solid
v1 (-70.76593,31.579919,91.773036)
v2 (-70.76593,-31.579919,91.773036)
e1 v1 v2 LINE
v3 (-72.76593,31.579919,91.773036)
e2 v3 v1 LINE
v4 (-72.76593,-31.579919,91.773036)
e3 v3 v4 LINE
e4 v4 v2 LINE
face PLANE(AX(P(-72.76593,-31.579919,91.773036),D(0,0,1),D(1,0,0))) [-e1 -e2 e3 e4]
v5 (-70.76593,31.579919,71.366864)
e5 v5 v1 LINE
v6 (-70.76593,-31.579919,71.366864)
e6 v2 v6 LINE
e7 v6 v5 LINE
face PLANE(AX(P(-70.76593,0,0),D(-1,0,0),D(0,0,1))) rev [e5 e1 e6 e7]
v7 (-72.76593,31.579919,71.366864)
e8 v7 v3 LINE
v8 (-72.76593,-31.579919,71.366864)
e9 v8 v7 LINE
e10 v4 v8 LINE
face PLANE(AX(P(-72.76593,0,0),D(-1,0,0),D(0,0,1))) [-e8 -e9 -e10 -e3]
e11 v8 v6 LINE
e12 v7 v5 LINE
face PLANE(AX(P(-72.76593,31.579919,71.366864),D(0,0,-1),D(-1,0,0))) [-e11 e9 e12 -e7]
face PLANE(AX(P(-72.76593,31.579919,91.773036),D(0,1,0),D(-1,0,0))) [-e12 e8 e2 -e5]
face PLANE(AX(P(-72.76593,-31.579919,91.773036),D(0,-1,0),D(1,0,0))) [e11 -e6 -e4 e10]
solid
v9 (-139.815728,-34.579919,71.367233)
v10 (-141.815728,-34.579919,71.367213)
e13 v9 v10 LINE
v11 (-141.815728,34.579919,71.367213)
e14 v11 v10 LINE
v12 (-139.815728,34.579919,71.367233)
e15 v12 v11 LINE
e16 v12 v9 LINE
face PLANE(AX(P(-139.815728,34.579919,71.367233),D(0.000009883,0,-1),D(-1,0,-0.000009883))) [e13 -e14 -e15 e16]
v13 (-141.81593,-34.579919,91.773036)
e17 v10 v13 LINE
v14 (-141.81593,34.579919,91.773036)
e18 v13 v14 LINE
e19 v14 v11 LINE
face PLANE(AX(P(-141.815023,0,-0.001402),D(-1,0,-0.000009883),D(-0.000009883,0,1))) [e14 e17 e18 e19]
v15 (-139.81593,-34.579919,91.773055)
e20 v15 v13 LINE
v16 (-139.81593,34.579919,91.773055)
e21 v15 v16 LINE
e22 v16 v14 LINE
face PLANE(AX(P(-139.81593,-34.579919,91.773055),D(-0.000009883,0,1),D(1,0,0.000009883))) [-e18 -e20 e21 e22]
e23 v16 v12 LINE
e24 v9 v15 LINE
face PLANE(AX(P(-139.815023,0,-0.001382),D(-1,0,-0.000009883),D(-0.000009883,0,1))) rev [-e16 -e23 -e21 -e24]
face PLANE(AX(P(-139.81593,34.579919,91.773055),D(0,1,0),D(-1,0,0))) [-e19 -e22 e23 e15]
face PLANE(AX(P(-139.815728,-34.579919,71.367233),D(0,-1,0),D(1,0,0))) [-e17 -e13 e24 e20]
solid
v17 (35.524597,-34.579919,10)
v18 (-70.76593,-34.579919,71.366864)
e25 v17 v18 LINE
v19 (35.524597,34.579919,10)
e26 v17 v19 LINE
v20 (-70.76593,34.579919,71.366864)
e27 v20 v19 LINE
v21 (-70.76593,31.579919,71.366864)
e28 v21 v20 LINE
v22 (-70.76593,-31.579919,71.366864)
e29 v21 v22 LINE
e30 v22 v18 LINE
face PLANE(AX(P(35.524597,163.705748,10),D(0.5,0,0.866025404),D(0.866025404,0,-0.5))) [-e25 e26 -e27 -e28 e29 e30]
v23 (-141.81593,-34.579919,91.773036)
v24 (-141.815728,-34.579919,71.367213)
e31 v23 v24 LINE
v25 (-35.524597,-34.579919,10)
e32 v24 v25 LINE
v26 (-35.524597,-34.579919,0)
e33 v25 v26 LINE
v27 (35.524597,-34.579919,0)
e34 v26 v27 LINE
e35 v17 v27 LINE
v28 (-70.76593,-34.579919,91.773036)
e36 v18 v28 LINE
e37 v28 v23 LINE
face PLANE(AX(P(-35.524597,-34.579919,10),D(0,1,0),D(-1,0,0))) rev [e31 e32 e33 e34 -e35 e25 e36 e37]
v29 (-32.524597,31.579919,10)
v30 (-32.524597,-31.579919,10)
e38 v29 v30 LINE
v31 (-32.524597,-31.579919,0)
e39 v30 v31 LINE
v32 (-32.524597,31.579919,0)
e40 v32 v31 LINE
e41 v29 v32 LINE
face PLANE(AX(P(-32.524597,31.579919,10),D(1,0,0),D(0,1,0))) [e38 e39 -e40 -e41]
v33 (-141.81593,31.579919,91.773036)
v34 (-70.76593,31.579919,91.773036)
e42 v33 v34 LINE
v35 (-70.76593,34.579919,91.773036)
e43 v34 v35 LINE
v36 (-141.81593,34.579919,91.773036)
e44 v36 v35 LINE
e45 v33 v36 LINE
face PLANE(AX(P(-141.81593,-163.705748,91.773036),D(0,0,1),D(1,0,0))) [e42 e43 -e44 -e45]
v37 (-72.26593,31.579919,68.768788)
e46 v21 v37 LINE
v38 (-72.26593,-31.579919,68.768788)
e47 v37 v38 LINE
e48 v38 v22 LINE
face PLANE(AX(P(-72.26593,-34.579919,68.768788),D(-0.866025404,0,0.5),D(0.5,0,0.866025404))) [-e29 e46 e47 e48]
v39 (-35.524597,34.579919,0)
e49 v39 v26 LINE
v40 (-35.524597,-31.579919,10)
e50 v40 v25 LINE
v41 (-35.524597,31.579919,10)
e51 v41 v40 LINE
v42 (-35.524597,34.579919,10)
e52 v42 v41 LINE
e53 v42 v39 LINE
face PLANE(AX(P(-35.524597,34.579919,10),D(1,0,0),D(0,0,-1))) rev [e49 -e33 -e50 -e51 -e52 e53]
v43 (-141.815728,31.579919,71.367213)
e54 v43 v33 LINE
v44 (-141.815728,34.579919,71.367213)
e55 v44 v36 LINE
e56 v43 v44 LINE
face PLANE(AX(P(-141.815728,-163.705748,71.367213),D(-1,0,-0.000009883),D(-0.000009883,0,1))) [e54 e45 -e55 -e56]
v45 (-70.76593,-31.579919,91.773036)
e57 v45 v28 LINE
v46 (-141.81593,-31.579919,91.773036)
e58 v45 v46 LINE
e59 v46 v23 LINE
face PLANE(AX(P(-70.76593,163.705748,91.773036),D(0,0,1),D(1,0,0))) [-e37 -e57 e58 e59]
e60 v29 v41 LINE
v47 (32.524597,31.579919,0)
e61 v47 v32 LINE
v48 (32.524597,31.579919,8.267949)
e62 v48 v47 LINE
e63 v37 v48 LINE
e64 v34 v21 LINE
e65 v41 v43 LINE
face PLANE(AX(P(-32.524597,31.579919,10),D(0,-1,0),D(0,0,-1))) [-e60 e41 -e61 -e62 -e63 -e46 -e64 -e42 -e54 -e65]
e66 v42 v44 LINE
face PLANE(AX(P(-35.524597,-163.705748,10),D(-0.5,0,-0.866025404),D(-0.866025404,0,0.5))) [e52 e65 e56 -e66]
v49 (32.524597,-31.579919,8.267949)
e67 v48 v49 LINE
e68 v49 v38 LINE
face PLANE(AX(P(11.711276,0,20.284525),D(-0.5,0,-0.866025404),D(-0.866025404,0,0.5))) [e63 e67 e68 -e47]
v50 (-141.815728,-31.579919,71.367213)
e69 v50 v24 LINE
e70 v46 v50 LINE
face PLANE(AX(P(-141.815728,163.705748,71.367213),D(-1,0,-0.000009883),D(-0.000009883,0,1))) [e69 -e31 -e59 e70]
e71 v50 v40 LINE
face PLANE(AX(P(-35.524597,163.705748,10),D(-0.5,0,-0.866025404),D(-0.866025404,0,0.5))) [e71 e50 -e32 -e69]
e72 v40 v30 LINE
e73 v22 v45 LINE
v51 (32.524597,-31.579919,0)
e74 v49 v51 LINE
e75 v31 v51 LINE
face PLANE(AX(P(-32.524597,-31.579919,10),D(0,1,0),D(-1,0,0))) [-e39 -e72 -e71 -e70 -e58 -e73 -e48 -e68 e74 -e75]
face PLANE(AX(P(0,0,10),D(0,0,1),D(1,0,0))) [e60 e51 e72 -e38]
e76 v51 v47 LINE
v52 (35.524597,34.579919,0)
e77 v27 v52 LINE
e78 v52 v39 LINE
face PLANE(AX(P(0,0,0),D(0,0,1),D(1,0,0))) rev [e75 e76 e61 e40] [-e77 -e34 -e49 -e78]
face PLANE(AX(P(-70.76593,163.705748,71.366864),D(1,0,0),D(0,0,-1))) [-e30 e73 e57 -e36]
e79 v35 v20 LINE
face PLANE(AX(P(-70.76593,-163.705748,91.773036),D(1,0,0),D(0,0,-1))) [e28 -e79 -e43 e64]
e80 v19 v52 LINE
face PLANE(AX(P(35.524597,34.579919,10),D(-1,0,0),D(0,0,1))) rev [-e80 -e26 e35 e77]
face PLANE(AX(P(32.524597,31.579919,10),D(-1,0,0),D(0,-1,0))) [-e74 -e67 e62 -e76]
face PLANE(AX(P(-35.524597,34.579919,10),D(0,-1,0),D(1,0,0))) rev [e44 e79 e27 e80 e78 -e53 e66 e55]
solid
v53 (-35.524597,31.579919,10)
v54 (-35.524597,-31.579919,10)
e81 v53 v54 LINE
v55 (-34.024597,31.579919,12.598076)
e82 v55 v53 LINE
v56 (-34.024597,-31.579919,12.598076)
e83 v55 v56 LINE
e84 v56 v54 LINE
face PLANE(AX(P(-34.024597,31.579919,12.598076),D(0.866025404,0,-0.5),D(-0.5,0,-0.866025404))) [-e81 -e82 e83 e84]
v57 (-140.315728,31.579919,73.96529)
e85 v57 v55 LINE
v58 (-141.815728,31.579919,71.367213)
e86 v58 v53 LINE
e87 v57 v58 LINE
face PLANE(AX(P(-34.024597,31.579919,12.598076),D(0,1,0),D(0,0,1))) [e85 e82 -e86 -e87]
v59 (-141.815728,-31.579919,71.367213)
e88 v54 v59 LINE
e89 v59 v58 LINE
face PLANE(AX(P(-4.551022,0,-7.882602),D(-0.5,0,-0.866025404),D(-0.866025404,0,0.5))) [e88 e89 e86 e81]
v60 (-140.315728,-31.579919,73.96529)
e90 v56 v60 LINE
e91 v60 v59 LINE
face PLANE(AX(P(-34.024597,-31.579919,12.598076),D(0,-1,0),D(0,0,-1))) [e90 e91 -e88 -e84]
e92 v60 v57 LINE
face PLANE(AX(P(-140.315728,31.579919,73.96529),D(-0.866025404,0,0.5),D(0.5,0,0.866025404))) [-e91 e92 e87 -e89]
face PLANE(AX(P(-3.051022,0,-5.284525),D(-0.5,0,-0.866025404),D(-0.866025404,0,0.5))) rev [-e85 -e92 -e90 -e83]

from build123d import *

# Parameters (mm, degrees)
SKETCH1_W            = 71.049193282
SKETCH1_H            = 69.159838322
SKETCH1_W_2          = 65.049193282
SKETCH1_H_2          = 63.159838322
BOSS_EXTRUDE1_DEPTH  = 10
BOSS_EXTRUDE2_DEPTH  = 3
BOSS_EXTRUDE3_DEPTH  = 3
SKETCH4_W            = 122.733728081
SKETCH4_H            = 69.159838322
BOSS_EXTRUDE5_DEPTH  = 3
SKETCH5_W            = 122.734426718
SKETCH5_H            = 63.159838322
BOSS_EXTRUDE14_DEPTH = 3
SKETCH6_W            = 20.406171659
SKETCH6_H            = 63.159838322
BASE_FLANGE1_DEPTH   = 2
SKETCH11_W           = 20.40582234
SKETCH11_H           = 69.159838322
BASE_FLANGE2_DEPTH   = 2


# Sheet-metal steps are written as plain solids
with BuildPart() as part:
    # Sketch1 → Boss-Extrude1 (new body)
    with BuildSketch(Plane.XY):
        Rectangle(SKETCH1_W, SKETCH1_H)
        Rectangle(SKETCH1_W_2, SKETCH1_H_2, mode=Mode.SUBTRACT)
    extrude(amount=BOSS_EXTRUDE1_DEPTH)

    # Sketch2 → Boss-Extrude2 (add)
    with BuildSketch(Plane.XZ.offset(34.579919161)):
        Polygon((35.524596641, 10), (-70.765929778, 71.36686404), (-70.765929778, 91.773035699), (-141.815929778, 91.773035699), (-141.815728099, 71.367213359), (-35.524596641, 10), align=None)
    extrude(amount=-BOSS_EXTRUDE2_DEPTH)

    # Sketch3 → Boss-Extrude3 (add)
    with BuildSketch(Plane(origin=(0, 34.579919161, 0), x_dir=(1, 0, 0), z_dir=(0, 1, 0))):
        Polygon((-35.524596641, -10), (-141.815728099, -71.367213359), (-141.815929778, -91.773035699), (-70.765929778, -91.773035699), (-70.765929778, -71.36686404), (35.524596641, -10), align=None)
    extrude(amount=-BOSS_EXTRUDE3_DEPTH)

    # Sketch4 → Boss-Extrude5 (add)
    with BuildSketch(Plane(origin=(13.211276179, 0, 22.882601575), x_dir=(0.8660254037844416, 0, -0.499999999999995), z_dir=(0.49999999999999495, 0, 0.8660254037844415))):
        with Locations((-35.601660889, 0)):
            Rectangle(SKETCH4_W, SKETCH4_H)
    extrude(amount=-BOSS_EXTRUDE5_DEPTH)


with BuildPart() as body_2:
    # Sketch5 → Boss-Extrude14 (new body)
    with BuildSketch(Plane(origin=(-4.551022141, 0, -7.882601575), x_dir=(-0.8660254037844417, 0, 0.49999999999999467), z_dir=(-0.49999999999999467, 0, -0.8660254037844417))):
        with Locations((97.13241651, 0)):
            Rectangle(SKETCH5_W, SKETCH5_H)
    extrude(amount=-BOSS_EXTRUDE14_DEPTH)


with BuildPart() as body_3:
    # Sketch6 → Base-Flange1 (new body)
    with BuildSketch(Plane(origin=(-70.765929778, 0, 0), x_dir=(0, 0, -1), z_dir=(1, 0, 0))):
        with Locations((-81.56994987, 0)):
            Rectangle(SKETCH6_W, SKETCH6_H)
    extrude(amount=-BASE_FLANGE1_DEPTH)


with BuildPart() as body_4:
    # Sketch11 → Base-Flange2 (new body)
    with BuildSketch(Plane(origin=(-141.815022732, 0, -0.001401618), x_dir=(-9.883423150445956e-06, 0, 0.9999999999511591), z_dir=(-0.9999999999511591, 0, -9.883423150445956e-06))):
        with Locations((81.571526151, 0)):
            Rectangle(SKETCH11_W, SKETCH11_H)
    extrude(amount=-BASE_FLANGE2_DEPTH)


solid = Compound([part.part, body_2.part, body_3.part, body_4.part])
